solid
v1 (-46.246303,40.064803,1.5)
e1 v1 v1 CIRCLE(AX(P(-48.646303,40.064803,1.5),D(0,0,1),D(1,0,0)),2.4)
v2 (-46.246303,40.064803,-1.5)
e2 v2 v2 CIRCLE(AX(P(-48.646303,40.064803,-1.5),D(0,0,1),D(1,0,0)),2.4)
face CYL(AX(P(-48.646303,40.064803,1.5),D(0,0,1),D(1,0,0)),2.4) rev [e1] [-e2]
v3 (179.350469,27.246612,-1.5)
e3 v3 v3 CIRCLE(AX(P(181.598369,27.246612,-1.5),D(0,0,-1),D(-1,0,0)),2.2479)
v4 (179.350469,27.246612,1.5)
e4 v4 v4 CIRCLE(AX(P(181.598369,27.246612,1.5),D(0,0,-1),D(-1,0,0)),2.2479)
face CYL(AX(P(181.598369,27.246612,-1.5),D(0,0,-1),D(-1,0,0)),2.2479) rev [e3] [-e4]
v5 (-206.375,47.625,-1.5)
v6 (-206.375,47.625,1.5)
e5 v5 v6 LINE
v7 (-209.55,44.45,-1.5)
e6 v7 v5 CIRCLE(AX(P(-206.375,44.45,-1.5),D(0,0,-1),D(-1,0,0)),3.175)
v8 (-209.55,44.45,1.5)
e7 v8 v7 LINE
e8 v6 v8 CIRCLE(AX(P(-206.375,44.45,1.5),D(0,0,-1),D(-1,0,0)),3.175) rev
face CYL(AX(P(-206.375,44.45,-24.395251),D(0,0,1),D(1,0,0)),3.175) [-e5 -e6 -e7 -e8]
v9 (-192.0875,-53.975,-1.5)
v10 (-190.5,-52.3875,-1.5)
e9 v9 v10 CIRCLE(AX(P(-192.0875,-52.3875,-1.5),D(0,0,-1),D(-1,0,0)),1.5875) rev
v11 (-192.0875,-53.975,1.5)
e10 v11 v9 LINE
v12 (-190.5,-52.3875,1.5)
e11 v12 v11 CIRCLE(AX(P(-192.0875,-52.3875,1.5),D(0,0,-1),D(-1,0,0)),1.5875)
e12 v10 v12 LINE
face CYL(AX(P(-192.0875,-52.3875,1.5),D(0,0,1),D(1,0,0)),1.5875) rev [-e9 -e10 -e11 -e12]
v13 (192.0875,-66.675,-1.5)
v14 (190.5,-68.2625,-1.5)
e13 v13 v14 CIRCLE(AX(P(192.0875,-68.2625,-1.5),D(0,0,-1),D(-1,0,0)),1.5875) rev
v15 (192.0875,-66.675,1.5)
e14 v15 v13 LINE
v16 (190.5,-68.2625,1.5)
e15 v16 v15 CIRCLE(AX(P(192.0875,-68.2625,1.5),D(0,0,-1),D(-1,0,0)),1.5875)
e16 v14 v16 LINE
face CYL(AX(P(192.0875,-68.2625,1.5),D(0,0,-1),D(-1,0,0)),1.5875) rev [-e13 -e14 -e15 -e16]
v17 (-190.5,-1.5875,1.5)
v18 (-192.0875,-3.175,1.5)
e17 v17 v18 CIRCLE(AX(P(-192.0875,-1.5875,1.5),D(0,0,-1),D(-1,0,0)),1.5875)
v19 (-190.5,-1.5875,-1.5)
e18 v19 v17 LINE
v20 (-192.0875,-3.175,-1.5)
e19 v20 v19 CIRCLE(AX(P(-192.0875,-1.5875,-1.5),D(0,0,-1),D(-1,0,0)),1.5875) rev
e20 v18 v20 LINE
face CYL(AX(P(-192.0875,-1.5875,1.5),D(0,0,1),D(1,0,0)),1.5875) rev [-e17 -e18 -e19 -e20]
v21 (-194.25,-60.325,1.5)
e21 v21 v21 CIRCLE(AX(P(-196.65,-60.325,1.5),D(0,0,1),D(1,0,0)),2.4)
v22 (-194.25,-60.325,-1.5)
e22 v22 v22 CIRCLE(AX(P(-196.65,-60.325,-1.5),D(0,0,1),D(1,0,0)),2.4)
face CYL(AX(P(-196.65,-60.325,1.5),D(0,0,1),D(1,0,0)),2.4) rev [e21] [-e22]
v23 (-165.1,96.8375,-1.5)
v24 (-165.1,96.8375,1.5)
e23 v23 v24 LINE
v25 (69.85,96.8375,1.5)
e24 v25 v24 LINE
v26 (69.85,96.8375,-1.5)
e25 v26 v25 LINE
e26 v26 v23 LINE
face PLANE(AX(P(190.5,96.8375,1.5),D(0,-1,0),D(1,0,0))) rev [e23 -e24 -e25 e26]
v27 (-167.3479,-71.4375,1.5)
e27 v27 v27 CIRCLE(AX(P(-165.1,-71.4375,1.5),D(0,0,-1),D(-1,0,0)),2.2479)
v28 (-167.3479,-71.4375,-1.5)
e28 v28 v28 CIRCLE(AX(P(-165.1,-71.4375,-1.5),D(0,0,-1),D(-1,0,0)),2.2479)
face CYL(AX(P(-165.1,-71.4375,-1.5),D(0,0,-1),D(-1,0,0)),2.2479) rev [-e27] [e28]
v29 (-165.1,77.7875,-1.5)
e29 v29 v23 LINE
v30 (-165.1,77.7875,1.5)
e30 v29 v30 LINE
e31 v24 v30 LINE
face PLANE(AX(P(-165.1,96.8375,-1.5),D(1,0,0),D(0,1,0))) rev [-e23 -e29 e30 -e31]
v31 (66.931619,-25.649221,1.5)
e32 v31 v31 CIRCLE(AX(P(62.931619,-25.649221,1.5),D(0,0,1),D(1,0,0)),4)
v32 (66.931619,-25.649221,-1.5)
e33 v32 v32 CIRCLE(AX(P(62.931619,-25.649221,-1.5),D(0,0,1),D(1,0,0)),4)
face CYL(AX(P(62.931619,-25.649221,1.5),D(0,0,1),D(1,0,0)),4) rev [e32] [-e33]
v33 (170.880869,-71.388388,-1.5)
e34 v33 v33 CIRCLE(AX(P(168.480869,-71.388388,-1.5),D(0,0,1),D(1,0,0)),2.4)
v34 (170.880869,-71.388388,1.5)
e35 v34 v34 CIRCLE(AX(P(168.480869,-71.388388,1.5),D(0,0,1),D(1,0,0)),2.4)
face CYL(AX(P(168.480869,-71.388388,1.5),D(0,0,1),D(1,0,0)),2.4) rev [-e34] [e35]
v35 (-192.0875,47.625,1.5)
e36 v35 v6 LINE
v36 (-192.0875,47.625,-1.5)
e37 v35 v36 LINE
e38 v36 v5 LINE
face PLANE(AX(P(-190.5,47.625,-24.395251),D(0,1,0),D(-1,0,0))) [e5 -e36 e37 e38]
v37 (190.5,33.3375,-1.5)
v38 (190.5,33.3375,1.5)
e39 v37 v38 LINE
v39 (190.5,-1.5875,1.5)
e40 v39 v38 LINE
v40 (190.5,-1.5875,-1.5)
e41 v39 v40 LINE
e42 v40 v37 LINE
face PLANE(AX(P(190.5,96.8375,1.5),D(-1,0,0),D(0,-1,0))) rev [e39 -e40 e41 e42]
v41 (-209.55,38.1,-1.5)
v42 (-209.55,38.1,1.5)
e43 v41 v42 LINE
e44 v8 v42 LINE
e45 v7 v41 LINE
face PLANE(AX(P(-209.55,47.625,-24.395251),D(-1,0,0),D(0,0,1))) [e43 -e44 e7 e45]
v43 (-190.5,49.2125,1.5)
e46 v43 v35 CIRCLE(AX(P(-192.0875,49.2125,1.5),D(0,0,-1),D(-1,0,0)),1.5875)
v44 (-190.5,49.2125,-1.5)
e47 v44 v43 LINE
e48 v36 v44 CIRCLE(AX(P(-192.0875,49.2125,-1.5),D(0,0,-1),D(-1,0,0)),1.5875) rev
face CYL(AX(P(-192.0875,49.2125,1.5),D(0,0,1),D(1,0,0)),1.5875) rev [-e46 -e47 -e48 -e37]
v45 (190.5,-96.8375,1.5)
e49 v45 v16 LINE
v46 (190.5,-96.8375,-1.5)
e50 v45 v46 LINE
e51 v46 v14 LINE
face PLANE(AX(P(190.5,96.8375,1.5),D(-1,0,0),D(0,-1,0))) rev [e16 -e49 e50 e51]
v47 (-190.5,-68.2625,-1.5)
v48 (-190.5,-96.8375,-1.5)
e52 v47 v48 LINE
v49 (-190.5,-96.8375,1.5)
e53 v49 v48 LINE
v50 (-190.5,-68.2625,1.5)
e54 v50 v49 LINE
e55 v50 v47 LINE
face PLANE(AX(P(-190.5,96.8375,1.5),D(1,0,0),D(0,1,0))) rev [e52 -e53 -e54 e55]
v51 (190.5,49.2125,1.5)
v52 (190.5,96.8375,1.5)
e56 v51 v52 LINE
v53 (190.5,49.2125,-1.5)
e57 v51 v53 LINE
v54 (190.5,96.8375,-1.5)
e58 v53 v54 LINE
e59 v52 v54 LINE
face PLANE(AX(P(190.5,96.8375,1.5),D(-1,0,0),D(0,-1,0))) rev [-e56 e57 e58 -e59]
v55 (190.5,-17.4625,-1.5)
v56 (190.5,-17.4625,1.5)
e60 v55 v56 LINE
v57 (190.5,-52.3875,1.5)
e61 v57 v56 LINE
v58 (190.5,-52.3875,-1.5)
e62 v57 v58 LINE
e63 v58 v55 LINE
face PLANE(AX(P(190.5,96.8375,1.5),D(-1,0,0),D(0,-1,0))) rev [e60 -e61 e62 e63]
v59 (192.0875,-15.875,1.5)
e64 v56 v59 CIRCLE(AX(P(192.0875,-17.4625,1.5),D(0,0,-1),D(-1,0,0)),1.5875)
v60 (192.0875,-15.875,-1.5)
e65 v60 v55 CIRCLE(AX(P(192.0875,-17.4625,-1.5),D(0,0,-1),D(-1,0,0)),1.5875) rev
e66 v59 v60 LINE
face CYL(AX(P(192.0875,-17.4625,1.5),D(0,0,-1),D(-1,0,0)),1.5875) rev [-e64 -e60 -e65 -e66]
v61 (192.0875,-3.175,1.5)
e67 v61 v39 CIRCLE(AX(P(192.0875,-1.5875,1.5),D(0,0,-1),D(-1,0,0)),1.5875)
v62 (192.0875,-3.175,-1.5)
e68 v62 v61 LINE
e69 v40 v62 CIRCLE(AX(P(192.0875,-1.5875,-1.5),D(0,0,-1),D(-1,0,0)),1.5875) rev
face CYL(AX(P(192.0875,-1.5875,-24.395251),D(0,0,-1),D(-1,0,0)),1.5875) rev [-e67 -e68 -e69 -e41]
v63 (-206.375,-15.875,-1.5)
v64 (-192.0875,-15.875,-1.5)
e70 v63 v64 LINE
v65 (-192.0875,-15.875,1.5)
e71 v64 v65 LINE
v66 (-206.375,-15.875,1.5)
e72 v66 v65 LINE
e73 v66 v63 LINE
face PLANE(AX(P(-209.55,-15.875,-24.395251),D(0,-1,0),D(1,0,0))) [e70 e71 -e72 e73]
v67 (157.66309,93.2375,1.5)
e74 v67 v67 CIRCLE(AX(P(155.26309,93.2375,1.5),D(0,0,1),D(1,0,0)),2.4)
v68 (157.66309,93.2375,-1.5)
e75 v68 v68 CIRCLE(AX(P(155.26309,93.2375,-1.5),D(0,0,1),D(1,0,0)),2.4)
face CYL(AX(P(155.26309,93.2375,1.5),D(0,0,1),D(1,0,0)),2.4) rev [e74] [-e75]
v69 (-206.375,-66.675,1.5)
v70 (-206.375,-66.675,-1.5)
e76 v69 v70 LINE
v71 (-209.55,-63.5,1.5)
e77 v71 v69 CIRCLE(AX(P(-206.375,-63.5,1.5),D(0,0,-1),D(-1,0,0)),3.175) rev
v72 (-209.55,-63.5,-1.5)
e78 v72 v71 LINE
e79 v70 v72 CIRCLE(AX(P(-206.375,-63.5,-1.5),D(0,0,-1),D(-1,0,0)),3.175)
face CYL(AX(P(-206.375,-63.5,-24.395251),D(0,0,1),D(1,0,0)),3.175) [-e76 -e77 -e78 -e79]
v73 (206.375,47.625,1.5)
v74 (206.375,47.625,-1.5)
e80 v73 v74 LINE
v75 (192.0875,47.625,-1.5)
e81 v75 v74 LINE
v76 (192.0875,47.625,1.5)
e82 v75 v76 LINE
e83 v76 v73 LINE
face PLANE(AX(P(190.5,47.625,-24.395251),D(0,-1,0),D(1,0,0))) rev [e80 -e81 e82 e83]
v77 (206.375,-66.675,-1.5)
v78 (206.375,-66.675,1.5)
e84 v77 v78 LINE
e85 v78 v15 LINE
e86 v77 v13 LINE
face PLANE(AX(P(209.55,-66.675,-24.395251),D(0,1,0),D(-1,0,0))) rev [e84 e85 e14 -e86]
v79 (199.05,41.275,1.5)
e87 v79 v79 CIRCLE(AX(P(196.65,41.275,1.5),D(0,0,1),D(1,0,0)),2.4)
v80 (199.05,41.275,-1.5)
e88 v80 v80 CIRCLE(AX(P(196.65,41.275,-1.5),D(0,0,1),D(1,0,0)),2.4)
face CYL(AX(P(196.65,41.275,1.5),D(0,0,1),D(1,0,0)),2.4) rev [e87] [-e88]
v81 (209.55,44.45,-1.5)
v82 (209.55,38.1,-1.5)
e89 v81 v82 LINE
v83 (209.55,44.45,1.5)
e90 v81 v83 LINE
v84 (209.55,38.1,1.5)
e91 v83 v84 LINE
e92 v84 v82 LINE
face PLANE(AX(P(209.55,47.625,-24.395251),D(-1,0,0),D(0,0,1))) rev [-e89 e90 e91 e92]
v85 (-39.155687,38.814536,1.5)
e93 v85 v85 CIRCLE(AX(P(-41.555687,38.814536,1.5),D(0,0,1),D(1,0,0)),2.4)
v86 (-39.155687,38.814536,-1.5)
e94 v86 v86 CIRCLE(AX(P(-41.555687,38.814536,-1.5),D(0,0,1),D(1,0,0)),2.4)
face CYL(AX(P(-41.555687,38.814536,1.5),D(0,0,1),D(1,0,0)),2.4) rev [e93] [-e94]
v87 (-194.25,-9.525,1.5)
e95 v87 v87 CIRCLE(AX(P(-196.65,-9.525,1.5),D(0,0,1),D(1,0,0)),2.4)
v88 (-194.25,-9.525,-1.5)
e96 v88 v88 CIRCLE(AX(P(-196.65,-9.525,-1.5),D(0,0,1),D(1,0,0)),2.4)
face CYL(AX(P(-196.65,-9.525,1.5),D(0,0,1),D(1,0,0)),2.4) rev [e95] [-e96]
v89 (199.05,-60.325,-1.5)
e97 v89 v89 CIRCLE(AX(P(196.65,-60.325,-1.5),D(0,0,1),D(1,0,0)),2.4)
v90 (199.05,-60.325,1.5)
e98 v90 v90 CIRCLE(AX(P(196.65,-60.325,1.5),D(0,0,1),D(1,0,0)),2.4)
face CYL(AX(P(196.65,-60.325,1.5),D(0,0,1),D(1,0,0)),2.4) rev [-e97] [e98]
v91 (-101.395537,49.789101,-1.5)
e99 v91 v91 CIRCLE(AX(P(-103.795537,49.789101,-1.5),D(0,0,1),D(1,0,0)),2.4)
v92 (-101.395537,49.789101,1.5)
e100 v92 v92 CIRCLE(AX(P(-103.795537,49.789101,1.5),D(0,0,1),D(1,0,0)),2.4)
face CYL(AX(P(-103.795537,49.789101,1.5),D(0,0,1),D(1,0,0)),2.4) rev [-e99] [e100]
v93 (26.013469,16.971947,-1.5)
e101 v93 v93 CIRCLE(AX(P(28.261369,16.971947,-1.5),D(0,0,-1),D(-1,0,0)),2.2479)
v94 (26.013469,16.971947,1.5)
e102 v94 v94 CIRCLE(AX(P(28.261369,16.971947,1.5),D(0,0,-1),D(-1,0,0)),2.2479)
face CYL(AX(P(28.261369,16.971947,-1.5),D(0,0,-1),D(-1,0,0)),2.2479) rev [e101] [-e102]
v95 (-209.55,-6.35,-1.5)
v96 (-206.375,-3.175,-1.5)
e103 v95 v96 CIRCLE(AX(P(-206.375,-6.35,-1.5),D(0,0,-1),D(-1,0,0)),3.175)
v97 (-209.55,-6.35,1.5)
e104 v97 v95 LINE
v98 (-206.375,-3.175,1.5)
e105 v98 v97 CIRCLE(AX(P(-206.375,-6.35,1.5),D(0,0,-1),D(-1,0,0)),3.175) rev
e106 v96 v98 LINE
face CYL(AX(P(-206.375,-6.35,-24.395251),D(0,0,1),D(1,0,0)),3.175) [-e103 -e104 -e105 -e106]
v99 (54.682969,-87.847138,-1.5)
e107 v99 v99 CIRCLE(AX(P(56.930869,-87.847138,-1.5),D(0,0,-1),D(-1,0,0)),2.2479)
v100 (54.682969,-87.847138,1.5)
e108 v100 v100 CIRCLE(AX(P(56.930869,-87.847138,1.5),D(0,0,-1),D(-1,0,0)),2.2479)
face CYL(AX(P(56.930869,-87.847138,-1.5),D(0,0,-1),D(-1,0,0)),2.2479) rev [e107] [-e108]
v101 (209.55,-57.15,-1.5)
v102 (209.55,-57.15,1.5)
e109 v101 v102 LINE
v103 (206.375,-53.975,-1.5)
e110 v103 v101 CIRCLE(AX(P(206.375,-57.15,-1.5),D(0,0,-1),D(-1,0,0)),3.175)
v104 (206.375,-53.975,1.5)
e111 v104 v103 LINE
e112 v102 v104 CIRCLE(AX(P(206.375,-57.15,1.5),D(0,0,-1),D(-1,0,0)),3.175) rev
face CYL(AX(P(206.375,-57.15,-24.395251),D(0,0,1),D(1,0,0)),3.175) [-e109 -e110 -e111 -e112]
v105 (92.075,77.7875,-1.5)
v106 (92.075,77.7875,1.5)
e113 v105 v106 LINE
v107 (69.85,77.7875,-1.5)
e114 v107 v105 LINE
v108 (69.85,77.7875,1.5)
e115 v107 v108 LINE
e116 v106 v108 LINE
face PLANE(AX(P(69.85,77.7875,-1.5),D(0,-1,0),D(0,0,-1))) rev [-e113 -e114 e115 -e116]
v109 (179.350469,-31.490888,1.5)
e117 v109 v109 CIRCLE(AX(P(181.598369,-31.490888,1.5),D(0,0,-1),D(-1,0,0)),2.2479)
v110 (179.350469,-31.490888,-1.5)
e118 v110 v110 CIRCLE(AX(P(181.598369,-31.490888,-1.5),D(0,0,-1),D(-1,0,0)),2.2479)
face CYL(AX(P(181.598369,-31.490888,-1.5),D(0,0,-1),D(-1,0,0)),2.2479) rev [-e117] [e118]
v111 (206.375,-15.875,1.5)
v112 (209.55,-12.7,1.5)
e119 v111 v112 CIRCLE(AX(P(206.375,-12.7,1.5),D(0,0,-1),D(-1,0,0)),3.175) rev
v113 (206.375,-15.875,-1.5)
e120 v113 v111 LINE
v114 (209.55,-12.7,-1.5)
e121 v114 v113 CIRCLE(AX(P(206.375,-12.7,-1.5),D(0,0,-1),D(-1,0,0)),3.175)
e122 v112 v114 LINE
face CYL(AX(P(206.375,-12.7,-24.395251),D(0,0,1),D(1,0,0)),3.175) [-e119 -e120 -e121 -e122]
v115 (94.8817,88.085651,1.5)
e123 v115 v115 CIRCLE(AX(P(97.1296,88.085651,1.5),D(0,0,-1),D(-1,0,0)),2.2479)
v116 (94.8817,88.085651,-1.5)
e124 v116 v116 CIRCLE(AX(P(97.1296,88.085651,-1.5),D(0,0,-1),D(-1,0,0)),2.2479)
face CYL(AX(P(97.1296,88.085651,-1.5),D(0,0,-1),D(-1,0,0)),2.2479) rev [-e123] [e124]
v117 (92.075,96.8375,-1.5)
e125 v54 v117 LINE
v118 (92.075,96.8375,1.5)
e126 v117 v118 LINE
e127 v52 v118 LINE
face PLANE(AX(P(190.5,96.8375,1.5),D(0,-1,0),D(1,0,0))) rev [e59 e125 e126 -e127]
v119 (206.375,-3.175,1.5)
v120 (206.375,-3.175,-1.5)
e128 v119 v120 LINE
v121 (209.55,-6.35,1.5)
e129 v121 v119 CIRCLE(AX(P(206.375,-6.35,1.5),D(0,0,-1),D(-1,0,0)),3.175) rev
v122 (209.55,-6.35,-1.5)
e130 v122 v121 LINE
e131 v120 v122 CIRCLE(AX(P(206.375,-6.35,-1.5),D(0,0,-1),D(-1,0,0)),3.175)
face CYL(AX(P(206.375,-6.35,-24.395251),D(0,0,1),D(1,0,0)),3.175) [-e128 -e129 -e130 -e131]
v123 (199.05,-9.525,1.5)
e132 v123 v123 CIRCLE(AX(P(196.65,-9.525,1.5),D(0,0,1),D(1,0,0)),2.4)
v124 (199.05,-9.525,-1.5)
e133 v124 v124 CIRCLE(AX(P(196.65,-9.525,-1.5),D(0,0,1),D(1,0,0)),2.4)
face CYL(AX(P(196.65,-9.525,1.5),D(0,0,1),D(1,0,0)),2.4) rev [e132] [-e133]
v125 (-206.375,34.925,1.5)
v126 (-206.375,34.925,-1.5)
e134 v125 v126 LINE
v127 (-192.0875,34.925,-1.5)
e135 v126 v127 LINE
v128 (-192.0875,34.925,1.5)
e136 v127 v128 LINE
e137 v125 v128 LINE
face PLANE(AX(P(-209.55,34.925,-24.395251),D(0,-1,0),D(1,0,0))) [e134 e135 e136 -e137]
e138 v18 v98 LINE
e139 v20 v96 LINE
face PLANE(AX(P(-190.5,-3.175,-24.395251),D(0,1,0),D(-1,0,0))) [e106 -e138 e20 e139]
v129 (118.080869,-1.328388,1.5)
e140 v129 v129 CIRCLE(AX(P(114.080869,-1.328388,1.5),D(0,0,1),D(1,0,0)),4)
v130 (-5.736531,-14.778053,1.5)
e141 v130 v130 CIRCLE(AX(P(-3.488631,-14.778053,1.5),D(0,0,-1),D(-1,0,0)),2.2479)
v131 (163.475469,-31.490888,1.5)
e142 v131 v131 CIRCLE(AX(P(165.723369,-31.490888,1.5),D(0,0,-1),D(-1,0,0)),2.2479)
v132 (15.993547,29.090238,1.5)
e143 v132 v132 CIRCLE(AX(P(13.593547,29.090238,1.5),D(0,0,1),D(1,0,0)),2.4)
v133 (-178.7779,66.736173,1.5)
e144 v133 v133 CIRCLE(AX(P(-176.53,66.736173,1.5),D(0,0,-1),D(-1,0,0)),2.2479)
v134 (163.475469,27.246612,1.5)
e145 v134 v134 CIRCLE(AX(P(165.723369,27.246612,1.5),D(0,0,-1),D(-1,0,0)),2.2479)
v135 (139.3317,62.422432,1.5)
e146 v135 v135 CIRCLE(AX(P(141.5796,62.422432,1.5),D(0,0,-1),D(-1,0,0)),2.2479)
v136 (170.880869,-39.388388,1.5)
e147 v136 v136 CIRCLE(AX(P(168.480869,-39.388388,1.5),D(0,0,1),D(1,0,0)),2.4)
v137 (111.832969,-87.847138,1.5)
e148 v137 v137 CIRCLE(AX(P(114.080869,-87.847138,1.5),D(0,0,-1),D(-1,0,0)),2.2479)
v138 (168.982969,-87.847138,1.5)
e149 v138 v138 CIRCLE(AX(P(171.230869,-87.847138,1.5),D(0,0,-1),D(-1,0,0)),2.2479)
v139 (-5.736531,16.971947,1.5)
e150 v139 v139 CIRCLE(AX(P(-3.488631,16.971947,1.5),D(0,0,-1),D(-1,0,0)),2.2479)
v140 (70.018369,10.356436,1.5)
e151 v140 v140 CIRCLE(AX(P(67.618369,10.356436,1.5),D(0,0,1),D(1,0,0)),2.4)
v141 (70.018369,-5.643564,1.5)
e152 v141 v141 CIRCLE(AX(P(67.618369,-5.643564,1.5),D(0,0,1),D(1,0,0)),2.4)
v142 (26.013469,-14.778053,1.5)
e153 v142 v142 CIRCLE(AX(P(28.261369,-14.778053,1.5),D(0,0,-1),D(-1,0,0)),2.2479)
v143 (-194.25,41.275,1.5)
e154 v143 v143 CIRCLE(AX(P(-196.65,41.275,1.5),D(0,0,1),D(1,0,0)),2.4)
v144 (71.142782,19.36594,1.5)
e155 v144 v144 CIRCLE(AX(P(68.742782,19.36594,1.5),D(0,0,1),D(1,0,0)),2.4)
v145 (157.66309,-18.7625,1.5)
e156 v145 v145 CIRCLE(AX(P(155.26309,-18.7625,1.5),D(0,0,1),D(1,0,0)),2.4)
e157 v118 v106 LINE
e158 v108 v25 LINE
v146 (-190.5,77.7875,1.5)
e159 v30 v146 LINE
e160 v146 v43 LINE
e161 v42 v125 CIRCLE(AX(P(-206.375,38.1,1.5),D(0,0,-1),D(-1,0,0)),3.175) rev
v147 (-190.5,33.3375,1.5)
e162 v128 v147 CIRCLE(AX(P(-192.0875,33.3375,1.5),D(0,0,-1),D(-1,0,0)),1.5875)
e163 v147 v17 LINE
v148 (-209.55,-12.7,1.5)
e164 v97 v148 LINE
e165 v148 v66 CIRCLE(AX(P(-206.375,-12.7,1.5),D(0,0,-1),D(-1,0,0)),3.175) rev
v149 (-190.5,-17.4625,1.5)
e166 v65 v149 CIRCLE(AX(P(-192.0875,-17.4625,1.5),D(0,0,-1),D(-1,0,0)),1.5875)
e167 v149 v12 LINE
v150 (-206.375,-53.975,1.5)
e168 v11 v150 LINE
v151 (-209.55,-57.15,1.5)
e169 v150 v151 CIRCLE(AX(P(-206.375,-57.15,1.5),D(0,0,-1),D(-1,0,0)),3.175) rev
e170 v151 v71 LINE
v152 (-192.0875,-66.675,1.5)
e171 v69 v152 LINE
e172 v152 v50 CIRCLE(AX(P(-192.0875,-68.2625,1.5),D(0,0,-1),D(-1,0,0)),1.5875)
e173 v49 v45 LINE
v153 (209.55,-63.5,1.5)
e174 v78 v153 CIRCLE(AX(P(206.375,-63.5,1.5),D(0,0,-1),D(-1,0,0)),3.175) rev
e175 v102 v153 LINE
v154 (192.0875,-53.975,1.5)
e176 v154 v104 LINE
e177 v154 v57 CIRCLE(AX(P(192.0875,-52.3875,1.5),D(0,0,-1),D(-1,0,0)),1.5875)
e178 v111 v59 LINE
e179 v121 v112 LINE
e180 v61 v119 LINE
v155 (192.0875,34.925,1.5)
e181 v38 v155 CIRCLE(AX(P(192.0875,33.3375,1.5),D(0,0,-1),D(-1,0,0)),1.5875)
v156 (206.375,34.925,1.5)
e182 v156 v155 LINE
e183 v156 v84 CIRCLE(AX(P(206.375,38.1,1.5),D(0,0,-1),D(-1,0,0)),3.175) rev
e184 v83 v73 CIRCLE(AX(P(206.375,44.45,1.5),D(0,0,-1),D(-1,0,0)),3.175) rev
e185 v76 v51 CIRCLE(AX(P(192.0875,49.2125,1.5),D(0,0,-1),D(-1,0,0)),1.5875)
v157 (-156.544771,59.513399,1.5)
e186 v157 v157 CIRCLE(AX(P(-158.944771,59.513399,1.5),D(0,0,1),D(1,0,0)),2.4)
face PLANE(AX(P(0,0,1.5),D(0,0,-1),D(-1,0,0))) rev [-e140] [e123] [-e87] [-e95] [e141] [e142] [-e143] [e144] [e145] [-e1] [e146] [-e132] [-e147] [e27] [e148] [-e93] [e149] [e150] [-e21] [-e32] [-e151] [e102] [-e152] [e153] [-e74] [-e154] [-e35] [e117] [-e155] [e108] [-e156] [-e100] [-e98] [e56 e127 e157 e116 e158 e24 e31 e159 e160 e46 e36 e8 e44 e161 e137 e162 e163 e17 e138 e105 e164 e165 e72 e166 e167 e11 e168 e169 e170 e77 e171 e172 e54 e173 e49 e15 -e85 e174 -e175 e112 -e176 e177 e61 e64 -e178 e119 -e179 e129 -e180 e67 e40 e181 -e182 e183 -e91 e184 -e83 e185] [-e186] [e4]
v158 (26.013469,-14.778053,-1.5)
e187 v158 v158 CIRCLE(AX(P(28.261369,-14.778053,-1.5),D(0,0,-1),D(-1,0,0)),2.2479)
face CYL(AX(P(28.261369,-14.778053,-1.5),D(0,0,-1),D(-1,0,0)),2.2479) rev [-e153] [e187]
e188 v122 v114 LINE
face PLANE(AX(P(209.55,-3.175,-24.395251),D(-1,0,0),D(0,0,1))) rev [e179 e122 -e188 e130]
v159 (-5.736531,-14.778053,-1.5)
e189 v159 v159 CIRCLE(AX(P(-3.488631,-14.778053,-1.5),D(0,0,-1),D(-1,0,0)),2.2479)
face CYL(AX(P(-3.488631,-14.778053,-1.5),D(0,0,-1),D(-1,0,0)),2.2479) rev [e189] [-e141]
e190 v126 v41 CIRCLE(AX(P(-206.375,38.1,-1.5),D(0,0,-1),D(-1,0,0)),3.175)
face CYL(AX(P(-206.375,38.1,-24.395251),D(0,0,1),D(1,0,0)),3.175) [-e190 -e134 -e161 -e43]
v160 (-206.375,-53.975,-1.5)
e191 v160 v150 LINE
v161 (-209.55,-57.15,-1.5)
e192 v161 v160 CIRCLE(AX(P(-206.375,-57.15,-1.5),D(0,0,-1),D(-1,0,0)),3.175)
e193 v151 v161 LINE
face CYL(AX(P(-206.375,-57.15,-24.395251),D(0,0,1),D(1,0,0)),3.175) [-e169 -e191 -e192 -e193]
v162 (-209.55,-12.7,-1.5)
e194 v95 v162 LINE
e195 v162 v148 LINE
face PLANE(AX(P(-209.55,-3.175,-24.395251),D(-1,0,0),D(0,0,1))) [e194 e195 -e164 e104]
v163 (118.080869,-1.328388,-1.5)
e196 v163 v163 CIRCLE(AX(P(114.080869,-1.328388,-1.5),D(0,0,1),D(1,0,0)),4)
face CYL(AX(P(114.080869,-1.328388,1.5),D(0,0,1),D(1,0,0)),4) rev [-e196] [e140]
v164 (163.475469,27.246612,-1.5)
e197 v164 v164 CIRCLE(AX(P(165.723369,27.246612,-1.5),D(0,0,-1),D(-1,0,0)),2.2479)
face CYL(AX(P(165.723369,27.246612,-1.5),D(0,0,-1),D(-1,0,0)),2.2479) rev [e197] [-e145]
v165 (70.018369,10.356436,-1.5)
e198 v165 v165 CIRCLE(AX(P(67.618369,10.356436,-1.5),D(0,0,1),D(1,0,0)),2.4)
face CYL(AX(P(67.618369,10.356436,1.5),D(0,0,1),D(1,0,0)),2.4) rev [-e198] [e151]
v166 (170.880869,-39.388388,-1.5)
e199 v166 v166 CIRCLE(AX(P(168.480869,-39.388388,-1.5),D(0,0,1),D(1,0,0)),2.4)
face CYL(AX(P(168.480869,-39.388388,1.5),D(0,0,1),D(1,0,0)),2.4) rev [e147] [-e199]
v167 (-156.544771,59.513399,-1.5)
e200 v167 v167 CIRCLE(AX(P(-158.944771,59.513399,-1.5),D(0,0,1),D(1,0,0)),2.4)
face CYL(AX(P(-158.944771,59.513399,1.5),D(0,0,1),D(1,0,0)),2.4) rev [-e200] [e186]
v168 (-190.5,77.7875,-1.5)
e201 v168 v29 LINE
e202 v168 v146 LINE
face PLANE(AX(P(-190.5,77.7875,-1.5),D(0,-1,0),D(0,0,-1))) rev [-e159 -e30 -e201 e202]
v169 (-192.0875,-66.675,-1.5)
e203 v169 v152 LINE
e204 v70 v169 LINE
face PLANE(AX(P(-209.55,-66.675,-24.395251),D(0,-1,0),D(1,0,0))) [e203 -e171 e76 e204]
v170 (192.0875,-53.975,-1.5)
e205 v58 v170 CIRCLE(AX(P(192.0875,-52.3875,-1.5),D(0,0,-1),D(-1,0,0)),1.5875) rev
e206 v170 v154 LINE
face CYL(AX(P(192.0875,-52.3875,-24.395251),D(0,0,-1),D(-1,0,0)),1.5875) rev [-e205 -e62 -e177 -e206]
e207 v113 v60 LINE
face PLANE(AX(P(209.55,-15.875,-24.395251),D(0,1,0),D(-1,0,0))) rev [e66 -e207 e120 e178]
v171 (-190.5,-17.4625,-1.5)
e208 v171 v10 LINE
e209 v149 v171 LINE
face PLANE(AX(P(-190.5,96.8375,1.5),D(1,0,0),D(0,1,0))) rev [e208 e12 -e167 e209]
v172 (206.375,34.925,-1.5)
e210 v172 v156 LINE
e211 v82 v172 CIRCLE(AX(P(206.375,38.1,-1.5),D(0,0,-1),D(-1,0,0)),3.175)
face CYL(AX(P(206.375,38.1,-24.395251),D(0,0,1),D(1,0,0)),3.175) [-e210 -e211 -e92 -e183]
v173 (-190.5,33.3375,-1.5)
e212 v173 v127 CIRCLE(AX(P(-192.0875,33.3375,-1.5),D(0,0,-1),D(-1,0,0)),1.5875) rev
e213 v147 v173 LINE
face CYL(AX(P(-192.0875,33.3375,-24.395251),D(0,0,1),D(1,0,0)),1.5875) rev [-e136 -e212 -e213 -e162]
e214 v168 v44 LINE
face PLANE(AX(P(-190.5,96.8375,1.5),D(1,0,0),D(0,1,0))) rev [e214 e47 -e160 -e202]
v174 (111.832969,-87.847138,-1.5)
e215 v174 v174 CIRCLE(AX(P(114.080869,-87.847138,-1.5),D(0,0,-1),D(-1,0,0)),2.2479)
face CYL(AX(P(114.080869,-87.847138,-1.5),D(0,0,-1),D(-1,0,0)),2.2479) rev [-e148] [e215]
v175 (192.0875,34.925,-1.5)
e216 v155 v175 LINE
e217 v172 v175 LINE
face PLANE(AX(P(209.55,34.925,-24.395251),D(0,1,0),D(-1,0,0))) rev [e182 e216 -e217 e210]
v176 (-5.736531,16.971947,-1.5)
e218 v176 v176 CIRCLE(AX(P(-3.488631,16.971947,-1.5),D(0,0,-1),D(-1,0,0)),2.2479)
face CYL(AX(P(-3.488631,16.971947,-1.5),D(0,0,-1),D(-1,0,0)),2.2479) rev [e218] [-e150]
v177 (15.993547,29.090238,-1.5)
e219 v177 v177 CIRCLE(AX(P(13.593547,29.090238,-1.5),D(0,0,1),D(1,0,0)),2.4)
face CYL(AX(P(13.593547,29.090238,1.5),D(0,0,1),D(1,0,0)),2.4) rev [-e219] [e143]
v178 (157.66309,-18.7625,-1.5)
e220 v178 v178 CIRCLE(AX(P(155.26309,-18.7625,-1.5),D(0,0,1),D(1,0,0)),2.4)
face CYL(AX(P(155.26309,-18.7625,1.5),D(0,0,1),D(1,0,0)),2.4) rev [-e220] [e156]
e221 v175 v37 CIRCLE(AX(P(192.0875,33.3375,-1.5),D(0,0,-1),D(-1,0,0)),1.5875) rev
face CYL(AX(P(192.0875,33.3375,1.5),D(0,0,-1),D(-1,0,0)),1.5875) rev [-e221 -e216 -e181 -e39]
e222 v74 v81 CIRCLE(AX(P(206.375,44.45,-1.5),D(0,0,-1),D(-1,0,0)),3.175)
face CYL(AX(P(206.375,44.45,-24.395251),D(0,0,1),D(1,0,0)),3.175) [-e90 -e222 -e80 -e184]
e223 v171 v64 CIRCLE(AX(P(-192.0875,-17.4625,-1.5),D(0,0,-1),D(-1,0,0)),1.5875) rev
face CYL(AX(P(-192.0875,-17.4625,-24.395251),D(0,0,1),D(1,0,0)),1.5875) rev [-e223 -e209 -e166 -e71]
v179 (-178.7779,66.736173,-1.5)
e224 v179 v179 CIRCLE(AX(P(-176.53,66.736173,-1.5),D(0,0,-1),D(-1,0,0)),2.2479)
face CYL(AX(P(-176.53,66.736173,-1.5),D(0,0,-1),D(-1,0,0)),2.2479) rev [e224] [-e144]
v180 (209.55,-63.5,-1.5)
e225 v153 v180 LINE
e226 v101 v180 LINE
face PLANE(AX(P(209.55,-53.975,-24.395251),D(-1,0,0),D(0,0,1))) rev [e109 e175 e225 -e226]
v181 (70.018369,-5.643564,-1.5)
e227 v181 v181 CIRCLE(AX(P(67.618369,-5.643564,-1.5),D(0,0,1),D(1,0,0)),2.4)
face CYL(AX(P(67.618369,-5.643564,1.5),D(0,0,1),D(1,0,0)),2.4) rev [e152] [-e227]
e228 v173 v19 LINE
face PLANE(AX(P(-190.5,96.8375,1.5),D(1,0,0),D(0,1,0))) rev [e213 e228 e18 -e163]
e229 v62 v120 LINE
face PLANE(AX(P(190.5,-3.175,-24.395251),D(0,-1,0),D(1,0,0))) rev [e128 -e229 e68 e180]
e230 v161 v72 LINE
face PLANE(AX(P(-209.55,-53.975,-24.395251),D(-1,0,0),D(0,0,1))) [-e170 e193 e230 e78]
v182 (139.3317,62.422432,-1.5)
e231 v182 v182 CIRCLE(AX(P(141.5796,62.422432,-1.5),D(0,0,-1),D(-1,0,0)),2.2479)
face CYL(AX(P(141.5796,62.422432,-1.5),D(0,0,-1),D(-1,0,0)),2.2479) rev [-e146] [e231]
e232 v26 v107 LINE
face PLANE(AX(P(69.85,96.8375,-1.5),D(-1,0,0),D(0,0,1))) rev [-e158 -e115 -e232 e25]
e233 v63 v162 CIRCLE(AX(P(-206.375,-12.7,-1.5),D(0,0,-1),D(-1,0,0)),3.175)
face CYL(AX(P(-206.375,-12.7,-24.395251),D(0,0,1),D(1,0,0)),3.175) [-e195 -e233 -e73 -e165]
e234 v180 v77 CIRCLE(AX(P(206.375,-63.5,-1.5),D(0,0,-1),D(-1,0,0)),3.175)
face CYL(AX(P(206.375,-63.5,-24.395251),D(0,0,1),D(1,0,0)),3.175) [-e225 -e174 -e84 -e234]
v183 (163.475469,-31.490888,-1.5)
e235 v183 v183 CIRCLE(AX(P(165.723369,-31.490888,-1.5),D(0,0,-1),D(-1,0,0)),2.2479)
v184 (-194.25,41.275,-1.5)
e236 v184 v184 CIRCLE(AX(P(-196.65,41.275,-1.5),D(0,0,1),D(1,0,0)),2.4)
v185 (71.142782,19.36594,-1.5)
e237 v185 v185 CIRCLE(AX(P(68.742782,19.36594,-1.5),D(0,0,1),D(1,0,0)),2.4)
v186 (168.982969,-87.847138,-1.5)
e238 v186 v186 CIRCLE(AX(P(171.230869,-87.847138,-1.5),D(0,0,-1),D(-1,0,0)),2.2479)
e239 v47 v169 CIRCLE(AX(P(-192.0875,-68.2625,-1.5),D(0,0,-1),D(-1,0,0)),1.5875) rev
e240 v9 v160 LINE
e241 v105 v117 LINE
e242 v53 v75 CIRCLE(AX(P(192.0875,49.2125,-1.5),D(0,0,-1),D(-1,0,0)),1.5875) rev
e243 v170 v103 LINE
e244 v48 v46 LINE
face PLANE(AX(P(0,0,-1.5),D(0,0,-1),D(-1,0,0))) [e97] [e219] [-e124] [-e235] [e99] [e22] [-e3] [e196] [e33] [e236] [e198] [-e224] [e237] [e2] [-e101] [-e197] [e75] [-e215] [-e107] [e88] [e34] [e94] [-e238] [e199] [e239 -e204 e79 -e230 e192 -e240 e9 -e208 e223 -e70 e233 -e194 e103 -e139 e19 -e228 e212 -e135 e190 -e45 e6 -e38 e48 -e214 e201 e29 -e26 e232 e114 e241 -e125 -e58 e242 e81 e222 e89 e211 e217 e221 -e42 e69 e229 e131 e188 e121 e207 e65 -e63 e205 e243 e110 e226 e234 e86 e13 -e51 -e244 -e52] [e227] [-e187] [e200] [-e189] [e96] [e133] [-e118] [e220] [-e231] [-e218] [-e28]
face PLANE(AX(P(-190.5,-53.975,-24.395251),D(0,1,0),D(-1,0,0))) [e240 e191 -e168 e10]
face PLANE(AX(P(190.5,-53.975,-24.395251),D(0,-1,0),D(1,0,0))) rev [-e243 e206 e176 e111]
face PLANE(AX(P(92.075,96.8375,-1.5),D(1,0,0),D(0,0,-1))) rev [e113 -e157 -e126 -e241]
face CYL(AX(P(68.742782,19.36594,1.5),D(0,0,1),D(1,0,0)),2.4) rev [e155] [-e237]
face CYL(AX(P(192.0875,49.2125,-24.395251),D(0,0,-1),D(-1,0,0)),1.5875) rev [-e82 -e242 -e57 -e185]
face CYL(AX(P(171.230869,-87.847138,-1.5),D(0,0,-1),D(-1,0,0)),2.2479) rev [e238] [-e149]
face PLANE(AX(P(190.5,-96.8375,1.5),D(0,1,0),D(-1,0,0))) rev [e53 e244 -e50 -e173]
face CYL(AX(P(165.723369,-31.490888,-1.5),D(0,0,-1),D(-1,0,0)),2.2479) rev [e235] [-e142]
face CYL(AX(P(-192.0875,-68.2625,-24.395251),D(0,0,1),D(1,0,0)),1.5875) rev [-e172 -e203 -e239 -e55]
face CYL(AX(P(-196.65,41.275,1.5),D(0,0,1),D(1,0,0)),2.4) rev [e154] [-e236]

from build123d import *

# Parameters (mm, degrees)
SKETCH1_W                  = 381
SKETCH1_H                  = 193.675
BOSS_EXTRUDE1_DEPTH        = 1.5
CUT_EXTRUDE1_DEPTH         = 214.72120018
CUT_EXTRUDE1_DEPTH_BACK    = 214.72120018
SKETCH2_W                  = 25.4
SKETCH2_H                  = 19.05
SKETCH2_W_2                = 22.225
SKETCH3_W                  = 19.05
SKETCH3_H                  = 12.7
BOSS_EXTRUDE2_DEPTH        = 3
FILLET1_R                  = 3.175
FILLET1_OF_MIRROR1_R       = 3.175
FILLET2_R                  = 1.5875
LPATTERN1_START            = -1.5
LPATTERN1_DEPTH            = 3
F_1_0MM_DOWEL_HOLE6_D      = 8
F_1_0MM_DOWEL_HOLE5_D      = 8
F_8_CLEARANCE_HOLE1_D      = 4.4958
F_1_0MM_DOWEL_HOLE1_D      = 4.8
F_1_0_4_8_DIAMETER_HOLE1_D = 4.8
LPATTERN2_COUNT            = 2
LPATTERN2_PITCH            = 50.8
LPATTERN2_COL_COUNT        = 2
LPATTERN2_COL_PITCH        = 50.8
MIRROR2_COPY_1_D           = 4.8
MIRROR2_COPY_2_D           = 4.8


# Read off the part's stored shape, not the designer's step: LPattern1
with BuildPart() as part:
    # Sketch1 → Boss-Extrude1 (new, symmetric)
    with BuildSketch(Plane.XY):
        Rectangle(SKETCH1_W, SKETCH1_H)
    extrude(amount=BOSS_EXTRUDE1_DEPTH, both=True)

    # Sketch2 → Cut-Extrude1 (cut, two sides: drawn at the far end of the back side and taken through both)
    with BuildSketch(Plane.XY.offset(1.5).offset(-CUT_EXTRUDE1_DEPTH_BACK)):
        with Locations((-177.8, 87.3125)):
            Rectangle(SKETCH2_W, SKETCH2_H)
        with Locations((80.9625, 87.3125)):
            Rectangle(SKETCH2_W_2, SKETCH2_H)
    extrude(amount=CUT_EXTRUDE1_DEPTH + CUT_EXTRUDE1_DEPTH_BACK, mode=Mode.SUBTRACT)

    # Sketch3 → Boss-Extrude2 (add)
    with BuildSketch(Plane.XY.offset(1.5)):
        with Locations((-200.025, -9.525)):
            Rectangle(SKETCH3_W, SKETCH3_H)
    boss_extrude2 = extrude(amount=-BOSS_EXTRUDE2_DEPTH)

    # Fillet1
    fillet1_edges = [part.edges().sort_by_distance(p)[0] for p in [
        (-209.55, -3.175, 0),
        (-209.55, -15.875, 0),
    ]]
    fillet(fillet1_edges, radius=FILLET1_R)

    # Mirror1: Boss-Extrude2 across plane
    add(boss_extrude2.mirror(Plane(origin=(0, 0, 0), x_dir=(0, 0, 1), z_dir=(1, 0, 0))))

    # Fillet1 of Mirror1
    fillet1_of_mirror1_edges = [part.edges().sort_by_distance(p)[0] for p in [
        (209.55, -3.175, 0),
        (209.55, -15.875, 0),
    ]]
    fillet(fillet1_of_mirror1_edges, radius=FILLET1_OF_MIRROR1_R)

    # Fillet2
    fillet2_edges = [part.edges().sort_by_distance(p)[0] for p in [
        (-190.5, -15.875, 0),
        (-190.5, -3.175, 0),
        (190.5, -15.875, 0),
        (190.5, -3.175, 0),
    ]]
    fillet(fillet2_edges, radius=FILLET2_R)

    # LPattern1 outline → LPattern1 (add)
    with BuildSketch(Plane.XY.offset(LPATTERN1_START)):
        with BuildLine():
            ThreePointArc((-206.375, 47.625), (-208.62006403, 46.69506403), (-209.55, 44.45))
            Line((-209.55, 44.45), (-209.55, 38.1))
            ThreePointArc((-209.55, 38.1), (-208.62006403, 35.85493597), (-206.375, 34.925))
            Line((-206.375, 34.925), (-192.0875, 34.925))
            ThreePointArc((-192.0875, 34.925), (-190.964967985, 34.460032015), (-190.5, 33.3375))
            Line((-190.5, 33.3375), (-190.5, 49.2125))
            ThreePointArc((-190.5, 49.2125), (-190.964967985, 48.089967985), (-192.0875, 47.625))
            Line((-192.0875, 47.625), (-206.375, 47.625))
        make_face()
        with BuildLine():
            ThreePointArc((-206.375, -53.975), (-208.62006403, -54.90493597), (-209.55, -57.15))
            Line((-209.55, -57.15), (-209.55, -63.5))
            ThreePointArc((-209.55, -63.5), (-208.62006403, -65.74506403), (-206.375, -66.675))
            Line((-206.375, -66.675), (-192.0875, -66.675))
            ThreePointArc((-192.0875, -66.675), (-190.964967985, -67.139967985), (-190.5, -68.2625))
            Line((-190.5, -68.2625), (-190.5, -52.3875))
            ThreePointArc((-190.5, -52.3875), (-190.964967985, -53.510032015), (-192.0875, -53.975))
            Line((-192.0875, -53.975), (-206.375, -53.975))
        make_face()
        with BuildLine():
            Line((209.55, 38.1), (209.55, 44.45))
            ThreePointArc((209.55, 44.45), (208.62006403, 46.69506403), (206.375, 47.625))
            Line((206.375, 47.625), (192.0875, 47.625))
            ThreePointArc((192.0875, 47.625), (190.964967985, 48.089967985), (190.5, 49.2125))
            Line((190.5, 49.2125), (190.5, 33.3375))
            ThreePointArc((190.5, 33.3375), (190.964967985, 34.460032015), (192.0875, 34.925))
            Line((192.0875, 34.925), (206.375, 34.925))
            ThreePointArc((206.375, 34.925), (208.62006403, 35.85493597), (209.55, 38.1))
        make_face()
        with BuildLine():
            Line((209.55, -63.5), (209.55, -57.15))
            ThreePointArc((209.55, -57.15), (208.62006403, -54.90493597), (206.375, -53.975))
            Line((206.375, -53.975), (192.0875, -53.975))
            ThreePointArc((192.0875, -53.975), (190.964967985, -53.510032015), (190.5, -52.3875))
            Line((190.5, -52.3875), (190.5, -68.2625))
            ThreePointArc((190.5, -68.2625), (190.964967985, -67.139967985), (192.0875, -66.675))
            Line((192.0875, -66.675), (206.375, -66.675))
            ThreePointArc((206.375, -66.675), (208.62006403, -65.74506403), (209.55, -63.5))
        make_face()
    extrude(amount=LPATTERN1_DEPTH)

    # Ø1.0mm Dowel Hole6 (through all)
    with Locations(Plane.XY.offset(1.5)):
        with Locations((114.080868605, -1.328387664)):
            Hole(F_1_0MM_DOWEL_HOLE6_D / 2)

    # Ø1.0mm Dowel Hole5 (through all)
    with Locations(Plane.XY.offset(1.5)):
        with Locations((62.931618599, -25.649221104)):
            Hole(F_1_0MM_DOWEL_HOLE5_D / 2)

    # #8 Clearance Hole1 (through all)
    with Locations(Plane(origin=(0, 0, -1.5), x_dir=(-1, 0, 0), z_dir=(0, 0, -1))):
        with Locations((3.488631395, 16.97194676), (-28.261368605, 16.97194676), (-28.261368605, -14.77805324), (3.488631395, -14.77805324), (-56.930868605, -87.847137664), (-114.080868605, -87.847137664), (-171.230868605, -87.847137664), (-165.723368605, 27.246612336), (-181.598368605, 27.246612336), (-181.598368605, -31.490887664), (-165.723368605, -31.490887664), (176.53, 66.736172691), (-97.1296, 88.08565122), (-141.5796, 62.422431754), (165.1, -71.4375)):
            Hole(F_8_CLEARANCE_HOLE1_D / 2)

    # Ø1.0mm Dowel Hole1 (through all)
    with Locations(Plane.XY.offset(1.5)):
        with Locations((-158.944770876, 59.513399002), (-48.646302539, 40.064803103), (-103.795536708, 49.789101052), (-41.555686717, 38.814536224), (13.593547451, 29.090238275), (68.74278162, 19.365940325), (67.618368605, 10.356435791), (67.618368605, -5.643564209), (155.263089531, -18.7625), (155.263089531, 93.2375), (168.480868605, -71.388387664), (168.480868605, -39.388387664)):
            Hole(F_1_0MM_DOWEL_HOLE1_D / 2)

    # Ø1.0 (4.8) Diameter Hole1 (through all)
    with Locations(Plane.XY.offset(1.5)):
        with Locations((196.65, -9.525)):
            f_1_0_4_8_diameter_hole1 = Hole(F_1_0_4_8_DIAMETER_HOLE1_D / 2)

    # LPattern2: Ø1.0 (4.8) Diameter Hole1 ×2
    with Locations(*[(0, i * LPATTERN2_PITCH, 0) for i in range(1, LPATTERN2_COUNT)]):
        add(f_1_0_4_8_diameter_hole1, mode=Mode.SUBTRACT)

    # LPattern2 col: Ø1.0 (4.8) Diameter Hole1 ×2
    with Locations(*[(0, -i * LPATTERN2_COL_PITCH, 0) for i in range(1, LPATTERN2_COL_COUNT)]):
        add(f_1_0_4_8_diameter_hole1, mode=Mode.SUBTRACT)

    # Mirror2: Ø1.0 (4.8) Diameter Hole1 across plane
    add(f_1_0_4_8_diameter_hole1.mirror(Plane(origin=(0, 0, 0), x_dir=(0, 0, 1), z_dir=(1, 0, 0))), mode=Mode.SUBTRACT)

    # Mirror2 copy 1 (through all)
    with Locations(Plane(origin=(0, 50.8, 1.5), x_dir=(-1, 0, 0), z_dir=(0, 0, 1))):
        with Locations((196.65, 9.525)):
            Hole(MIRROR2_COPY_1_D / 2)

    # Mirror2 copy 2 (through all)
    with Locations(Plane(origin=(0, -50.8, 1.5), x_dir=(-1, 0, 0), z_dir=(0, 0, 1))):
        with Locations((196.65, 9.525)):
            Hole(MIRROR2_COPY_2_D / 2)


solid = part.part
